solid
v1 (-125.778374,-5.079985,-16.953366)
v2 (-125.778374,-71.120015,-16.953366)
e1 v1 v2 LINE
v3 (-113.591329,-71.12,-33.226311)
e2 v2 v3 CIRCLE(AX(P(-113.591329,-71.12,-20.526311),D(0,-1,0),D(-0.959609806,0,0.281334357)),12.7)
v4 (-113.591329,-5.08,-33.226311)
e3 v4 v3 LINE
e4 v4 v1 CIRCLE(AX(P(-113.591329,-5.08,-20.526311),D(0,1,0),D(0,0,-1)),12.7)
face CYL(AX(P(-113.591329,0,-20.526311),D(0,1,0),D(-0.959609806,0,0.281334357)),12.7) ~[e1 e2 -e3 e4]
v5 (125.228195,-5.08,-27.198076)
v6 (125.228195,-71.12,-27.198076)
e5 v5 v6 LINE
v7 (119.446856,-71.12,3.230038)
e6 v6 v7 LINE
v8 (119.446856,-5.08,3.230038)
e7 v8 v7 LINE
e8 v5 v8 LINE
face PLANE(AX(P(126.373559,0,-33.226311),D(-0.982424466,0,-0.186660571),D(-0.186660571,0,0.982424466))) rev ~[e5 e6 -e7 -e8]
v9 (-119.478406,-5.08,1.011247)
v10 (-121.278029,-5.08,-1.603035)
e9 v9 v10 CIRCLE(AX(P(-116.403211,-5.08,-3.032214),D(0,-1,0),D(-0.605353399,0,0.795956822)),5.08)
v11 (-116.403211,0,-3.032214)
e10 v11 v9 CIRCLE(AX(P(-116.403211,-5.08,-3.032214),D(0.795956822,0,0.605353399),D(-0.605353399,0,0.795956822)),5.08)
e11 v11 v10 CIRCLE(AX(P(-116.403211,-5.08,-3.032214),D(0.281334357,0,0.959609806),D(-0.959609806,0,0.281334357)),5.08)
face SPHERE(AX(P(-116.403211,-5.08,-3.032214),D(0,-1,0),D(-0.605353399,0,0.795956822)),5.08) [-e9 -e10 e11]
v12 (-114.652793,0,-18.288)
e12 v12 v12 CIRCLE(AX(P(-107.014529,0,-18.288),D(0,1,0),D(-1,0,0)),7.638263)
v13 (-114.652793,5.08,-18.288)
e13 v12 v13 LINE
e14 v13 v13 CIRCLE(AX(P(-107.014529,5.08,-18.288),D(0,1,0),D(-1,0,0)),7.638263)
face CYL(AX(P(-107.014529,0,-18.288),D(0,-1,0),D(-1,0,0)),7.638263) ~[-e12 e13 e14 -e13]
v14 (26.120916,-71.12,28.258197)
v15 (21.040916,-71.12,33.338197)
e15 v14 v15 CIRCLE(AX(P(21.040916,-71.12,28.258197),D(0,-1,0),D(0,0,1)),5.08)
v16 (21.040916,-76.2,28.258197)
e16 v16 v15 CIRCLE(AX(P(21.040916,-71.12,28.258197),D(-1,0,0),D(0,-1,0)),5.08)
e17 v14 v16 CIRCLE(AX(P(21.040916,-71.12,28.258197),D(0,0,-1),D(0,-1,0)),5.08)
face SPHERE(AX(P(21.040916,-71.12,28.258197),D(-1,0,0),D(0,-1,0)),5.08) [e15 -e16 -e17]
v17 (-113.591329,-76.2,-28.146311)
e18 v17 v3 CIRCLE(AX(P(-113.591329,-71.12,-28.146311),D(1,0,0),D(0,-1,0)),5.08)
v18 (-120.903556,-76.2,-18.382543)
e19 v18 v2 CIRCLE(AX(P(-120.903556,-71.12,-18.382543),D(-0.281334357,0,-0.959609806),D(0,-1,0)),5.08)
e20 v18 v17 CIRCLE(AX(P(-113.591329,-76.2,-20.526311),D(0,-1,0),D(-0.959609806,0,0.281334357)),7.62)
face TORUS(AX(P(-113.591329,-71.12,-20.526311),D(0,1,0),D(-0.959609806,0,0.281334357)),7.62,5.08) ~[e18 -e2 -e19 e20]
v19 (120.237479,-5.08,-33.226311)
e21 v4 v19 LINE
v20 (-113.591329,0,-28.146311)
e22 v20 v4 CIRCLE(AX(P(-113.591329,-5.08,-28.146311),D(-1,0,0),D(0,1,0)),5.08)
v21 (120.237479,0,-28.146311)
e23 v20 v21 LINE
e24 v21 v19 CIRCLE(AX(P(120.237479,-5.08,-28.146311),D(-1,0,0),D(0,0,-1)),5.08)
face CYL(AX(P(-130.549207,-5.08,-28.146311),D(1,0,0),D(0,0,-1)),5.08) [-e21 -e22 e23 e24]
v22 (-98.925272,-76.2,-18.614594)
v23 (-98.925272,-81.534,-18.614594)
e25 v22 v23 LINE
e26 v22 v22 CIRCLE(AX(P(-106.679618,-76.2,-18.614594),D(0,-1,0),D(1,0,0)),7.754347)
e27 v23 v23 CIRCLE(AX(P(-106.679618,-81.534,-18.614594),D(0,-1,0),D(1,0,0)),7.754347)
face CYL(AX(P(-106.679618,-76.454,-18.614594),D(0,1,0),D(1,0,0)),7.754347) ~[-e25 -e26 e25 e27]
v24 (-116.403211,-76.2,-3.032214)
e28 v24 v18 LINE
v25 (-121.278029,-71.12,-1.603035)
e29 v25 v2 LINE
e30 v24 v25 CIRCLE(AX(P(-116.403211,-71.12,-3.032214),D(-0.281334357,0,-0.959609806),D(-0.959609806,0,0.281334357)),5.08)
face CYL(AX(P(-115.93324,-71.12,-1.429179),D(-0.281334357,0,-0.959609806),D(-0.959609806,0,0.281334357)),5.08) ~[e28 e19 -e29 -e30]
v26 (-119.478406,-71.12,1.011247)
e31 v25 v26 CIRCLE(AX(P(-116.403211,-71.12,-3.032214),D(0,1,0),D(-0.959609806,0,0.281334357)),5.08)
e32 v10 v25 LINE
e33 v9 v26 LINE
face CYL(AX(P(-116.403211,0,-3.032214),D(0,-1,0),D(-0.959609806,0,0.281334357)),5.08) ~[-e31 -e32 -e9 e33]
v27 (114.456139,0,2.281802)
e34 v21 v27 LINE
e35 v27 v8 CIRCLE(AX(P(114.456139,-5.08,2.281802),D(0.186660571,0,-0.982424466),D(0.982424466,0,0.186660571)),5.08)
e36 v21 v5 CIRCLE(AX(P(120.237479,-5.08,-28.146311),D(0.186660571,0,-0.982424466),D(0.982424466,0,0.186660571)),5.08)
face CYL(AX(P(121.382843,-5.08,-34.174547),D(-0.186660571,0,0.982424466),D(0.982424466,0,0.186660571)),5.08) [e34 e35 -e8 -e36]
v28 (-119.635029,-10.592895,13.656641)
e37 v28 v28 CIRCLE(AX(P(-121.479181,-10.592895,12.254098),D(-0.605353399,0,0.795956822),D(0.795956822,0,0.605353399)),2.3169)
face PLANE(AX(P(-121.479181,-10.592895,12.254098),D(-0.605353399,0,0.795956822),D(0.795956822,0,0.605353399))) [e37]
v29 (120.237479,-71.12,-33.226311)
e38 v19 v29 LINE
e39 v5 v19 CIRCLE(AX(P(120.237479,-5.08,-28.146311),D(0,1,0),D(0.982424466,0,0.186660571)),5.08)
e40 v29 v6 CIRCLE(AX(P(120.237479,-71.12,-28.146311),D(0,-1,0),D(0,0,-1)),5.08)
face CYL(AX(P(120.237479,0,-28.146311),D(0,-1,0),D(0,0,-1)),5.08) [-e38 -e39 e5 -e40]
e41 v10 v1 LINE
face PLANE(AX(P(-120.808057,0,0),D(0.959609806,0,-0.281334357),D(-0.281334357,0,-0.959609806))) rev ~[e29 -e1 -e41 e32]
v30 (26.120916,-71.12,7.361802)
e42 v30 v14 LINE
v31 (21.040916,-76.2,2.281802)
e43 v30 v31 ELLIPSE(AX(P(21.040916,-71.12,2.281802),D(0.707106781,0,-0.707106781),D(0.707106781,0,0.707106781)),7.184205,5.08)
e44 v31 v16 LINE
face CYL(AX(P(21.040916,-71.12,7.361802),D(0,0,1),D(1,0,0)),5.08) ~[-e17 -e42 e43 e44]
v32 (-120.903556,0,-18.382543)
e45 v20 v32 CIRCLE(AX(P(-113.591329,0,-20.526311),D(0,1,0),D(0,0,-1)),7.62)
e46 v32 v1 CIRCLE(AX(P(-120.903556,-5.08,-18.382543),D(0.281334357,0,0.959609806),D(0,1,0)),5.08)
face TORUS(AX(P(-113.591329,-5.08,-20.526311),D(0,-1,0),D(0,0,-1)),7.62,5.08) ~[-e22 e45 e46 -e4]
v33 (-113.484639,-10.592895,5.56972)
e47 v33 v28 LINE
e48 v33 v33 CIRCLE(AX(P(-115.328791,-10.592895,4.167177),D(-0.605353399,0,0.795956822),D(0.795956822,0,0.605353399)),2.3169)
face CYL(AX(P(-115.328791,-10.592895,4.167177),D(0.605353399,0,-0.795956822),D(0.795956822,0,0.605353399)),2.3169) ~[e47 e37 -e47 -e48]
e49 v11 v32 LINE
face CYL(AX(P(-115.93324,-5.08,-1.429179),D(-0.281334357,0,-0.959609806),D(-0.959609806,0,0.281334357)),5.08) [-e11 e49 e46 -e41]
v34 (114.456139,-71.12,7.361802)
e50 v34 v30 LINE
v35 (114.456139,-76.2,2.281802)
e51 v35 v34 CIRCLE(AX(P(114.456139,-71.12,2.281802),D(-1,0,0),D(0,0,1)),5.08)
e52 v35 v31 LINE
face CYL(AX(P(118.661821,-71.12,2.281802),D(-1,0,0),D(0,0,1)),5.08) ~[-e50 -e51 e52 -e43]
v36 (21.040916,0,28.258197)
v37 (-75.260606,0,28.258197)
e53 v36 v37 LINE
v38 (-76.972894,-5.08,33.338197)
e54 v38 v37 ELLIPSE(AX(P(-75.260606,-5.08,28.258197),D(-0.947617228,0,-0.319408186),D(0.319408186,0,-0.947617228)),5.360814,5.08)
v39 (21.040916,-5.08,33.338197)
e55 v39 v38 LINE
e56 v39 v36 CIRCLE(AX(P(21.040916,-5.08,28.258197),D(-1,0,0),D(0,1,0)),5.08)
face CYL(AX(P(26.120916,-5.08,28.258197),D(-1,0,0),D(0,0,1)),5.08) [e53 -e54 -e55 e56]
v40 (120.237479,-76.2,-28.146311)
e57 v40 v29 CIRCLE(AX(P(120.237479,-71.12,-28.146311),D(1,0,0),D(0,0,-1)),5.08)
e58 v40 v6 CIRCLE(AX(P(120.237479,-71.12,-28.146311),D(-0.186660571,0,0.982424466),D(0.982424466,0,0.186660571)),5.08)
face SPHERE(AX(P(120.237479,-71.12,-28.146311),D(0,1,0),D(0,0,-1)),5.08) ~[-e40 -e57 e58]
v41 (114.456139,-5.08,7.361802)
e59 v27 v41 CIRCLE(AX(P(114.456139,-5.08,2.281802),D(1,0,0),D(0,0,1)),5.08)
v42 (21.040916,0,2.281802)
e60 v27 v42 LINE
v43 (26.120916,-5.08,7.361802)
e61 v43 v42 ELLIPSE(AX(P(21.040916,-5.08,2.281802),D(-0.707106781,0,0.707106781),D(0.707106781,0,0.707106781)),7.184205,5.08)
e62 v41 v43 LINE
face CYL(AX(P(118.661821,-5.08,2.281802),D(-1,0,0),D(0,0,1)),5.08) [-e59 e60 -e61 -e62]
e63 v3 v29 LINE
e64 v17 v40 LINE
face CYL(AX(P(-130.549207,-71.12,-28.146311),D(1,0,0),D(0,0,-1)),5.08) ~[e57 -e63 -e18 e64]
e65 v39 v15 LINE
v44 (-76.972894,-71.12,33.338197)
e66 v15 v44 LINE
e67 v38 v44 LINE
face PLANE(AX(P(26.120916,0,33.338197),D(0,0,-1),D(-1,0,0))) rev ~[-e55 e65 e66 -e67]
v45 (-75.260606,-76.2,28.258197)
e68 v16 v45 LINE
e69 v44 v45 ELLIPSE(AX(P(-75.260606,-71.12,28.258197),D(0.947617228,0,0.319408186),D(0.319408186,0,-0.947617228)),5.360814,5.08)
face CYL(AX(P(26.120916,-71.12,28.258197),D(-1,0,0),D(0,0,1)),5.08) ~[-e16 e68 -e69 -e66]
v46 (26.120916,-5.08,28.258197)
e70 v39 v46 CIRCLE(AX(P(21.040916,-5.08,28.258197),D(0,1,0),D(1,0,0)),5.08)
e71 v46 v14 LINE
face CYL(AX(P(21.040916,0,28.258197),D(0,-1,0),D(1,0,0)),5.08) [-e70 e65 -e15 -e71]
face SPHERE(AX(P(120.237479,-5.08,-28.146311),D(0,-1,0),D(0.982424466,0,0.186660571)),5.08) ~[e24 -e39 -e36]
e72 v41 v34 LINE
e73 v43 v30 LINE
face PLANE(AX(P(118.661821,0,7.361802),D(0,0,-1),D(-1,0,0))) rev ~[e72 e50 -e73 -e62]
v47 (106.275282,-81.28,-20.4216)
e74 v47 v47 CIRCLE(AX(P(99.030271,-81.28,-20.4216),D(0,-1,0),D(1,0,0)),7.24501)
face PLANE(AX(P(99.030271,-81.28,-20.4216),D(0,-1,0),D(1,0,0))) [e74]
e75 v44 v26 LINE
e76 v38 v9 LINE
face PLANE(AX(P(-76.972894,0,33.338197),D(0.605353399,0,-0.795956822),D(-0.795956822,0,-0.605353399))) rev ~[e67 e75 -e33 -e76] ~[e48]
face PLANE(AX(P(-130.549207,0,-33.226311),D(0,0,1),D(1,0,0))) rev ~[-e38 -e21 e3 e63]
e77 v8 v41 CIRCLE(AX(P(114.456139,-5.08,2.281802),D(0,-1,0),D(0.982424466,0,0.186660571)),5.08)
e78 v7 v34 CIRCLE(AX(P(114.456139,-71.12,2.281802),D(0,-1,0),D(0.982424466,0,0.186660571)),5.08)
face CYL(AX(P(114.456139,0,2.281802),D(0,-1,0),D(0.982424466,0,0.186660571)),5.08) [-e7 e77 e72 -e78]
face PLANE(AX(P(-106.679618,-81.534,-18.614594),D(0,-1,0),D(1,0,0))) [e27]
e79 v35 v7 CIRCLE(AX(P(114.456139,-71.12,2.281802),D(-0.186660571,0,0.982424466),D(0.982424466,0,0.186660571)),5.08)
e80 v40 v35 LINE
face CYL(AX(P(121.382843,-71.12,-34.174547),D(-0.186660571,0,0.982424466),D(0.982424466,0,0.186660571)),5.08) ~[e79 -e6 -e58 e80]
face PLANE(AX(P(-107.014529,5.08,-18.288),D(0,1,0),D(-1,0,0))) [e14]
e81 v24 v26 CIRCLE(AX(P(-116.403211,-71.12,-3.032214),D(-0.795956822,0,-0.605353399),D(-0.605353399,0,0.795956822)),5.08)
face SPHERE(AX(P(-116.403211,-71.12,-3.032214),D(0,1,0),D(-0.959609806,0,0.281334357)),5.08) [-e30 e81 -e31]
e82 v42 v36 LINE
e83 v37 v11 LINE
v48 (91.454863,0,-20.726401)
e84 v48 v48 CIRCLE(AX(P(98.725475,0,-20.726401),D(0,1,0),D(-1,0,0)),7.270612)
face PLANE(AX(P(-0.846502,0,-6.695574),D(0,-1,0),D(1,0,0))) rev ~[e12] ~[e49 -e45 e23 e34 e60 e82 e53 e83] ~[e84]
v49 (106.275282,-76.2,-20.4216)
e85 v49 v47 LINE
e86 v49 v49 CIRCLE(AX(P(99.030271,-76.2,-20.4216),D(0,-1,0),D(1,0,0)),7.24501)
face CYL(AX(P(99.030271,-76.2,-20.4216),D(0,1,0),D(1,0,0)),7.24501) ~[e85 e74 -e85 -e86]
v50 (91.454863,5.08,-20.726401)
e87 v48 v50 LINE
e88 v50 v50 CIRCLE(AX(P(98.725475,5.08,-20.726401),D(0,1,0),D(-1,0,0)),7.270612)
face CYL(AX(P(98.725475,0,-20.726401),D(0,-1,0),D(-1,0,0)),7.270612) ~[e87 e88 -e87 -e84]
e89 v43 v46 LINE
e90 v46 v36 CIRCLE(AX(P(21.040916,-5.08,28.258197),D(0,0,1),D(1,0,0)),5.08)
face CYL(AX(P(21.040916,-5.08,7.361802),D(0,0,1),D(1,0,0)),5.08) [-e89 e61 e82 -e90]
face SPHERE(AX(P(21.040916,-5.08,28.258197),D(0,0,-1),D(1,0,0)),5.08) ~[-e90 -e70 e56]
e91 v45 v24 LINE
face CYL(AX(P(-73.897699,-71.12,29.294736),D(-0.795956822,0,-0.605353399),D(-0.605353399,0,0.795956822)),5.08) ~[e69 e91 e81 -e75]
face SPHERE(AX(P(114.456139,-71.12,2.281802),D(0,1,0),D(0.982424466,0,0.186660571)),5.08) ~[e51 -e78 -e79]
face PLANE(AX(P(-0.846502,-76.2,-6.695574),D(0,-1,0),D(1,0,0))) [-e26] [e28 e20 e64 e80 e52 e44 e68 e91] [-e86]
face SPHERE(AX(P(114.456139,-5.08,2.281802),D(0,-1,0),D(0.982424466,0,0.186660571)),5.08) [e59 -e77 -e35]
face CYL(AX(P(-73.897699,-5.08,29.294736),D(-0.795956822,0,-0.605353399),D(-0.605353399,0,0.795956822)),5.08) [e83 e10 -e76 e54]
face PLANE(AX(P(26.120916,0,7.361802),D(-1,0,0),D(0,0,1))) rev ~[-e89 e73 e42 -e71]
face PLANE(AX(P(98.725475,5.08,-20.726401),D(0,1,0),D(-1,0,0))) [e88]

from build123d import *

# Parameters (mm, degrees)
F1_DEPTH    = 76.2
F2_R        = 5.08
F3_T1_DEPTH = 76.2
F3_T4_ANGLE = 106.3398594687
F3_T6_ANGLE = 106.3398594687
F4_R        = 7.7543468395
F5_DEPTH    = 0.254
F6_DEPTH    = 5.08
F7_R        = 7.6382634684
F8_DEPTH    = 5.08
F10_R       = 7.2706121331
F11_DEPTH   = 5.08
F9_R        = 7.2450103535
F12_DEPTH   = 5.08
F13_R       = 2.3168995741
F14_DEPTH   = 10.16


# Not quite as in the source:
# - a fillet or chamfer that OpenCascade refuses, or shapes differently, is made with other operations: its cross-section is extruded or revolved along the edge and cut away or added
# - the program builds the solid bodies; features that only make, move or delete a surface that nothing else refers to are left out


with BuildPart() as f1:
    # F0 (on Front) → F1 (new body)
    with BuildSketch(Plane.XZ):
        Polygon((-120.808057487, 0), (-130.5492073298, -33.2263112068), (126.3735592365, -33.2263112068), (118.6618208885, 7.3618022725), (26.1209160089, 7.3618022725), (26.1209160089, 33.3381965756), (-76.9728943706, 33.3381965756), align=None)
    extrude(amount=F1_DEPTH)

    # F2
    f2_edges = [f1.edges().sort_by_distance(p)[0] for p in [
        (-125.678632, -76.2, -16.613156),
        (-98.890476, -76.2, 16.669098),
        (-25.425989, -76.2, 33.338197),
        (26.120916, -76.2, 20.349999),
        (26.120916, 0, 20.349999),
        (26.120916, -38.1, 33.338197),
        (-98.890476, 0, 16.669098),
        (-25.425989, 0, 33.338197),
        (-125.678632, 0, -16.613156),
        (-2.087824, 0, -33.226311),
        (-120.808057, -38.1, 0),
        (-2.087824, -76.2, -33.226311),
        (72.391368, -76.2, 7.361802),
        (118.661821, -38.1, 7.361802),
        (122.51769, -76.2, -12.932254),
        (126.373559, -38.1, -33.226311),
        (122.51769, 0, -12.932254),
        (72.391368, 0, 7.361802),
    ]]
    fillet(f2_edges, radius=F2_R)

    # F3: fillet of radius 12.7 on 1 edges, made by hand

    # F3_s2 → F3_t1 (cut)
    with BuildSketch(Plane.XZ):
        with BuildLine():
            ThreePointArc((-125.7783735266, -16.9533648691), (-123.756623344, -28.1392469582), (-113.5913289929, -33.2263112068))
            Line((-113.5913289929, -33.2263112068), (-130.5492073298, -33.2263112068))
            Line((-130.5492073298, -33.2263112068), (-125.7783735266, -16.9533648691))
        make_face()
    extrude(amount=F3_T1_DEPTH, mode=Mode.SUBTRACT)

    # F3_s3 → F3_t4 (revolve, cut)
    with BuildSketch(Plane.YZ.offset(-113.5913289929)):
        with BuildLine():
            ThreePointArc((0, -28.1463112068), (-1.4878975516, -31.7384136552), (-5.08, -33.2263112068))
            Line((-5.08, -33.2263112068), (0, -33.2263112068))
            Line((0, -33.2263112068), (0, -28.1463112068))
        make_face()
    revolve(axis=Axis((-113.5913289929, 0, -20.5263112068), (0, 1, 0)), revolution_arc=F3_T4_ANGLE, mode=Mode.SUBTRACT)

    # F3_s5 → F3_t6 (revolve, cut)
    with BuildSketch(Plane(origin=(-14.5321554702, 0, -49.5680620824), x_dir=(0, 1, 0), z_dir=(0.2813343573, 0, 0.9596098058))):
        with BuildLine():
            ThreePointArc((-76.2, 110.848596585), (-74.7121024484, 114.4406990334), (-71.12, 115.928596585))
            Line((-71.12, 115.928596585), (-76.2, 115.928596585))
            Line((-76.2, 115.928596585), (-76.2, 110.848596585))
        make_face()
    revolve(axis=Axis((-113.5913289929, -76.2, -20.5263112068), (0, -1, 0)), revolution_arc=F3_T6_ANGLE, mode=Mode.SUBTRACT)

    # F4 (on face) → F5 (join)
    with BuildSketch(Plane.XZ.offset(76.2)):
        with Locations((-106.6796183586, -18.6145938933)):
            Circle(F4_R)
    extrude(amount=F5_DEPTH)

    # F6 (add): a face of the model
    f6_faces = [f1.faces().sort_by_distance(p)[0] for p in [
        (-106.6796183586, -76.454, -18.6145938933),
    ]]
    extrude(f6_faces, amount=F6_DEPTH)

    # F7 (on face) → F8 (join)
    with BuildSketch(Plane(origin=(0, 0, 0), x_dir=(-1, 0, 0), z_dir=(0, 1, 0))):
        with Locations((107.014529407, -18.2879995555)):
            Circle(F7_R)
    extrude(amount=F8_DEPTH)

    # F10 (on face) → F11 (join)
    with BuildSketch(Plane(origin=(0, 0, 0), x_dir=(-1, 0, 0), z_dir=(0, 1, 0))):
        with Locations((-98.7254753709, -20.7264013588)):
            Circle(F10_R)
    extrude(amount=F11_DEPTH)

    # F9 (on face) → F12 (join)
    with BuildSketch(Plane.XZ.offset(76.2)):
        with Locations((99.0302711725, -20.4215999693)):
            Circle(F9_R)
    extrude(amount=F12_DEPTH)

    # F13 (on face) → F14 (join)
    with BuildSketch(Plane(origin=(-44.2704434122, 0, 58.2095706289), x_dir=(0.7959568218, 0, 0.6053533991), z_dir=(-0.6053533991, 0, 0.7959568218))):
        with Locations((-89.274123311, -10.5928946286)):
            Circle(F13_R)
    extrude(amount=F14_DEPTH)


solid = f1.part
